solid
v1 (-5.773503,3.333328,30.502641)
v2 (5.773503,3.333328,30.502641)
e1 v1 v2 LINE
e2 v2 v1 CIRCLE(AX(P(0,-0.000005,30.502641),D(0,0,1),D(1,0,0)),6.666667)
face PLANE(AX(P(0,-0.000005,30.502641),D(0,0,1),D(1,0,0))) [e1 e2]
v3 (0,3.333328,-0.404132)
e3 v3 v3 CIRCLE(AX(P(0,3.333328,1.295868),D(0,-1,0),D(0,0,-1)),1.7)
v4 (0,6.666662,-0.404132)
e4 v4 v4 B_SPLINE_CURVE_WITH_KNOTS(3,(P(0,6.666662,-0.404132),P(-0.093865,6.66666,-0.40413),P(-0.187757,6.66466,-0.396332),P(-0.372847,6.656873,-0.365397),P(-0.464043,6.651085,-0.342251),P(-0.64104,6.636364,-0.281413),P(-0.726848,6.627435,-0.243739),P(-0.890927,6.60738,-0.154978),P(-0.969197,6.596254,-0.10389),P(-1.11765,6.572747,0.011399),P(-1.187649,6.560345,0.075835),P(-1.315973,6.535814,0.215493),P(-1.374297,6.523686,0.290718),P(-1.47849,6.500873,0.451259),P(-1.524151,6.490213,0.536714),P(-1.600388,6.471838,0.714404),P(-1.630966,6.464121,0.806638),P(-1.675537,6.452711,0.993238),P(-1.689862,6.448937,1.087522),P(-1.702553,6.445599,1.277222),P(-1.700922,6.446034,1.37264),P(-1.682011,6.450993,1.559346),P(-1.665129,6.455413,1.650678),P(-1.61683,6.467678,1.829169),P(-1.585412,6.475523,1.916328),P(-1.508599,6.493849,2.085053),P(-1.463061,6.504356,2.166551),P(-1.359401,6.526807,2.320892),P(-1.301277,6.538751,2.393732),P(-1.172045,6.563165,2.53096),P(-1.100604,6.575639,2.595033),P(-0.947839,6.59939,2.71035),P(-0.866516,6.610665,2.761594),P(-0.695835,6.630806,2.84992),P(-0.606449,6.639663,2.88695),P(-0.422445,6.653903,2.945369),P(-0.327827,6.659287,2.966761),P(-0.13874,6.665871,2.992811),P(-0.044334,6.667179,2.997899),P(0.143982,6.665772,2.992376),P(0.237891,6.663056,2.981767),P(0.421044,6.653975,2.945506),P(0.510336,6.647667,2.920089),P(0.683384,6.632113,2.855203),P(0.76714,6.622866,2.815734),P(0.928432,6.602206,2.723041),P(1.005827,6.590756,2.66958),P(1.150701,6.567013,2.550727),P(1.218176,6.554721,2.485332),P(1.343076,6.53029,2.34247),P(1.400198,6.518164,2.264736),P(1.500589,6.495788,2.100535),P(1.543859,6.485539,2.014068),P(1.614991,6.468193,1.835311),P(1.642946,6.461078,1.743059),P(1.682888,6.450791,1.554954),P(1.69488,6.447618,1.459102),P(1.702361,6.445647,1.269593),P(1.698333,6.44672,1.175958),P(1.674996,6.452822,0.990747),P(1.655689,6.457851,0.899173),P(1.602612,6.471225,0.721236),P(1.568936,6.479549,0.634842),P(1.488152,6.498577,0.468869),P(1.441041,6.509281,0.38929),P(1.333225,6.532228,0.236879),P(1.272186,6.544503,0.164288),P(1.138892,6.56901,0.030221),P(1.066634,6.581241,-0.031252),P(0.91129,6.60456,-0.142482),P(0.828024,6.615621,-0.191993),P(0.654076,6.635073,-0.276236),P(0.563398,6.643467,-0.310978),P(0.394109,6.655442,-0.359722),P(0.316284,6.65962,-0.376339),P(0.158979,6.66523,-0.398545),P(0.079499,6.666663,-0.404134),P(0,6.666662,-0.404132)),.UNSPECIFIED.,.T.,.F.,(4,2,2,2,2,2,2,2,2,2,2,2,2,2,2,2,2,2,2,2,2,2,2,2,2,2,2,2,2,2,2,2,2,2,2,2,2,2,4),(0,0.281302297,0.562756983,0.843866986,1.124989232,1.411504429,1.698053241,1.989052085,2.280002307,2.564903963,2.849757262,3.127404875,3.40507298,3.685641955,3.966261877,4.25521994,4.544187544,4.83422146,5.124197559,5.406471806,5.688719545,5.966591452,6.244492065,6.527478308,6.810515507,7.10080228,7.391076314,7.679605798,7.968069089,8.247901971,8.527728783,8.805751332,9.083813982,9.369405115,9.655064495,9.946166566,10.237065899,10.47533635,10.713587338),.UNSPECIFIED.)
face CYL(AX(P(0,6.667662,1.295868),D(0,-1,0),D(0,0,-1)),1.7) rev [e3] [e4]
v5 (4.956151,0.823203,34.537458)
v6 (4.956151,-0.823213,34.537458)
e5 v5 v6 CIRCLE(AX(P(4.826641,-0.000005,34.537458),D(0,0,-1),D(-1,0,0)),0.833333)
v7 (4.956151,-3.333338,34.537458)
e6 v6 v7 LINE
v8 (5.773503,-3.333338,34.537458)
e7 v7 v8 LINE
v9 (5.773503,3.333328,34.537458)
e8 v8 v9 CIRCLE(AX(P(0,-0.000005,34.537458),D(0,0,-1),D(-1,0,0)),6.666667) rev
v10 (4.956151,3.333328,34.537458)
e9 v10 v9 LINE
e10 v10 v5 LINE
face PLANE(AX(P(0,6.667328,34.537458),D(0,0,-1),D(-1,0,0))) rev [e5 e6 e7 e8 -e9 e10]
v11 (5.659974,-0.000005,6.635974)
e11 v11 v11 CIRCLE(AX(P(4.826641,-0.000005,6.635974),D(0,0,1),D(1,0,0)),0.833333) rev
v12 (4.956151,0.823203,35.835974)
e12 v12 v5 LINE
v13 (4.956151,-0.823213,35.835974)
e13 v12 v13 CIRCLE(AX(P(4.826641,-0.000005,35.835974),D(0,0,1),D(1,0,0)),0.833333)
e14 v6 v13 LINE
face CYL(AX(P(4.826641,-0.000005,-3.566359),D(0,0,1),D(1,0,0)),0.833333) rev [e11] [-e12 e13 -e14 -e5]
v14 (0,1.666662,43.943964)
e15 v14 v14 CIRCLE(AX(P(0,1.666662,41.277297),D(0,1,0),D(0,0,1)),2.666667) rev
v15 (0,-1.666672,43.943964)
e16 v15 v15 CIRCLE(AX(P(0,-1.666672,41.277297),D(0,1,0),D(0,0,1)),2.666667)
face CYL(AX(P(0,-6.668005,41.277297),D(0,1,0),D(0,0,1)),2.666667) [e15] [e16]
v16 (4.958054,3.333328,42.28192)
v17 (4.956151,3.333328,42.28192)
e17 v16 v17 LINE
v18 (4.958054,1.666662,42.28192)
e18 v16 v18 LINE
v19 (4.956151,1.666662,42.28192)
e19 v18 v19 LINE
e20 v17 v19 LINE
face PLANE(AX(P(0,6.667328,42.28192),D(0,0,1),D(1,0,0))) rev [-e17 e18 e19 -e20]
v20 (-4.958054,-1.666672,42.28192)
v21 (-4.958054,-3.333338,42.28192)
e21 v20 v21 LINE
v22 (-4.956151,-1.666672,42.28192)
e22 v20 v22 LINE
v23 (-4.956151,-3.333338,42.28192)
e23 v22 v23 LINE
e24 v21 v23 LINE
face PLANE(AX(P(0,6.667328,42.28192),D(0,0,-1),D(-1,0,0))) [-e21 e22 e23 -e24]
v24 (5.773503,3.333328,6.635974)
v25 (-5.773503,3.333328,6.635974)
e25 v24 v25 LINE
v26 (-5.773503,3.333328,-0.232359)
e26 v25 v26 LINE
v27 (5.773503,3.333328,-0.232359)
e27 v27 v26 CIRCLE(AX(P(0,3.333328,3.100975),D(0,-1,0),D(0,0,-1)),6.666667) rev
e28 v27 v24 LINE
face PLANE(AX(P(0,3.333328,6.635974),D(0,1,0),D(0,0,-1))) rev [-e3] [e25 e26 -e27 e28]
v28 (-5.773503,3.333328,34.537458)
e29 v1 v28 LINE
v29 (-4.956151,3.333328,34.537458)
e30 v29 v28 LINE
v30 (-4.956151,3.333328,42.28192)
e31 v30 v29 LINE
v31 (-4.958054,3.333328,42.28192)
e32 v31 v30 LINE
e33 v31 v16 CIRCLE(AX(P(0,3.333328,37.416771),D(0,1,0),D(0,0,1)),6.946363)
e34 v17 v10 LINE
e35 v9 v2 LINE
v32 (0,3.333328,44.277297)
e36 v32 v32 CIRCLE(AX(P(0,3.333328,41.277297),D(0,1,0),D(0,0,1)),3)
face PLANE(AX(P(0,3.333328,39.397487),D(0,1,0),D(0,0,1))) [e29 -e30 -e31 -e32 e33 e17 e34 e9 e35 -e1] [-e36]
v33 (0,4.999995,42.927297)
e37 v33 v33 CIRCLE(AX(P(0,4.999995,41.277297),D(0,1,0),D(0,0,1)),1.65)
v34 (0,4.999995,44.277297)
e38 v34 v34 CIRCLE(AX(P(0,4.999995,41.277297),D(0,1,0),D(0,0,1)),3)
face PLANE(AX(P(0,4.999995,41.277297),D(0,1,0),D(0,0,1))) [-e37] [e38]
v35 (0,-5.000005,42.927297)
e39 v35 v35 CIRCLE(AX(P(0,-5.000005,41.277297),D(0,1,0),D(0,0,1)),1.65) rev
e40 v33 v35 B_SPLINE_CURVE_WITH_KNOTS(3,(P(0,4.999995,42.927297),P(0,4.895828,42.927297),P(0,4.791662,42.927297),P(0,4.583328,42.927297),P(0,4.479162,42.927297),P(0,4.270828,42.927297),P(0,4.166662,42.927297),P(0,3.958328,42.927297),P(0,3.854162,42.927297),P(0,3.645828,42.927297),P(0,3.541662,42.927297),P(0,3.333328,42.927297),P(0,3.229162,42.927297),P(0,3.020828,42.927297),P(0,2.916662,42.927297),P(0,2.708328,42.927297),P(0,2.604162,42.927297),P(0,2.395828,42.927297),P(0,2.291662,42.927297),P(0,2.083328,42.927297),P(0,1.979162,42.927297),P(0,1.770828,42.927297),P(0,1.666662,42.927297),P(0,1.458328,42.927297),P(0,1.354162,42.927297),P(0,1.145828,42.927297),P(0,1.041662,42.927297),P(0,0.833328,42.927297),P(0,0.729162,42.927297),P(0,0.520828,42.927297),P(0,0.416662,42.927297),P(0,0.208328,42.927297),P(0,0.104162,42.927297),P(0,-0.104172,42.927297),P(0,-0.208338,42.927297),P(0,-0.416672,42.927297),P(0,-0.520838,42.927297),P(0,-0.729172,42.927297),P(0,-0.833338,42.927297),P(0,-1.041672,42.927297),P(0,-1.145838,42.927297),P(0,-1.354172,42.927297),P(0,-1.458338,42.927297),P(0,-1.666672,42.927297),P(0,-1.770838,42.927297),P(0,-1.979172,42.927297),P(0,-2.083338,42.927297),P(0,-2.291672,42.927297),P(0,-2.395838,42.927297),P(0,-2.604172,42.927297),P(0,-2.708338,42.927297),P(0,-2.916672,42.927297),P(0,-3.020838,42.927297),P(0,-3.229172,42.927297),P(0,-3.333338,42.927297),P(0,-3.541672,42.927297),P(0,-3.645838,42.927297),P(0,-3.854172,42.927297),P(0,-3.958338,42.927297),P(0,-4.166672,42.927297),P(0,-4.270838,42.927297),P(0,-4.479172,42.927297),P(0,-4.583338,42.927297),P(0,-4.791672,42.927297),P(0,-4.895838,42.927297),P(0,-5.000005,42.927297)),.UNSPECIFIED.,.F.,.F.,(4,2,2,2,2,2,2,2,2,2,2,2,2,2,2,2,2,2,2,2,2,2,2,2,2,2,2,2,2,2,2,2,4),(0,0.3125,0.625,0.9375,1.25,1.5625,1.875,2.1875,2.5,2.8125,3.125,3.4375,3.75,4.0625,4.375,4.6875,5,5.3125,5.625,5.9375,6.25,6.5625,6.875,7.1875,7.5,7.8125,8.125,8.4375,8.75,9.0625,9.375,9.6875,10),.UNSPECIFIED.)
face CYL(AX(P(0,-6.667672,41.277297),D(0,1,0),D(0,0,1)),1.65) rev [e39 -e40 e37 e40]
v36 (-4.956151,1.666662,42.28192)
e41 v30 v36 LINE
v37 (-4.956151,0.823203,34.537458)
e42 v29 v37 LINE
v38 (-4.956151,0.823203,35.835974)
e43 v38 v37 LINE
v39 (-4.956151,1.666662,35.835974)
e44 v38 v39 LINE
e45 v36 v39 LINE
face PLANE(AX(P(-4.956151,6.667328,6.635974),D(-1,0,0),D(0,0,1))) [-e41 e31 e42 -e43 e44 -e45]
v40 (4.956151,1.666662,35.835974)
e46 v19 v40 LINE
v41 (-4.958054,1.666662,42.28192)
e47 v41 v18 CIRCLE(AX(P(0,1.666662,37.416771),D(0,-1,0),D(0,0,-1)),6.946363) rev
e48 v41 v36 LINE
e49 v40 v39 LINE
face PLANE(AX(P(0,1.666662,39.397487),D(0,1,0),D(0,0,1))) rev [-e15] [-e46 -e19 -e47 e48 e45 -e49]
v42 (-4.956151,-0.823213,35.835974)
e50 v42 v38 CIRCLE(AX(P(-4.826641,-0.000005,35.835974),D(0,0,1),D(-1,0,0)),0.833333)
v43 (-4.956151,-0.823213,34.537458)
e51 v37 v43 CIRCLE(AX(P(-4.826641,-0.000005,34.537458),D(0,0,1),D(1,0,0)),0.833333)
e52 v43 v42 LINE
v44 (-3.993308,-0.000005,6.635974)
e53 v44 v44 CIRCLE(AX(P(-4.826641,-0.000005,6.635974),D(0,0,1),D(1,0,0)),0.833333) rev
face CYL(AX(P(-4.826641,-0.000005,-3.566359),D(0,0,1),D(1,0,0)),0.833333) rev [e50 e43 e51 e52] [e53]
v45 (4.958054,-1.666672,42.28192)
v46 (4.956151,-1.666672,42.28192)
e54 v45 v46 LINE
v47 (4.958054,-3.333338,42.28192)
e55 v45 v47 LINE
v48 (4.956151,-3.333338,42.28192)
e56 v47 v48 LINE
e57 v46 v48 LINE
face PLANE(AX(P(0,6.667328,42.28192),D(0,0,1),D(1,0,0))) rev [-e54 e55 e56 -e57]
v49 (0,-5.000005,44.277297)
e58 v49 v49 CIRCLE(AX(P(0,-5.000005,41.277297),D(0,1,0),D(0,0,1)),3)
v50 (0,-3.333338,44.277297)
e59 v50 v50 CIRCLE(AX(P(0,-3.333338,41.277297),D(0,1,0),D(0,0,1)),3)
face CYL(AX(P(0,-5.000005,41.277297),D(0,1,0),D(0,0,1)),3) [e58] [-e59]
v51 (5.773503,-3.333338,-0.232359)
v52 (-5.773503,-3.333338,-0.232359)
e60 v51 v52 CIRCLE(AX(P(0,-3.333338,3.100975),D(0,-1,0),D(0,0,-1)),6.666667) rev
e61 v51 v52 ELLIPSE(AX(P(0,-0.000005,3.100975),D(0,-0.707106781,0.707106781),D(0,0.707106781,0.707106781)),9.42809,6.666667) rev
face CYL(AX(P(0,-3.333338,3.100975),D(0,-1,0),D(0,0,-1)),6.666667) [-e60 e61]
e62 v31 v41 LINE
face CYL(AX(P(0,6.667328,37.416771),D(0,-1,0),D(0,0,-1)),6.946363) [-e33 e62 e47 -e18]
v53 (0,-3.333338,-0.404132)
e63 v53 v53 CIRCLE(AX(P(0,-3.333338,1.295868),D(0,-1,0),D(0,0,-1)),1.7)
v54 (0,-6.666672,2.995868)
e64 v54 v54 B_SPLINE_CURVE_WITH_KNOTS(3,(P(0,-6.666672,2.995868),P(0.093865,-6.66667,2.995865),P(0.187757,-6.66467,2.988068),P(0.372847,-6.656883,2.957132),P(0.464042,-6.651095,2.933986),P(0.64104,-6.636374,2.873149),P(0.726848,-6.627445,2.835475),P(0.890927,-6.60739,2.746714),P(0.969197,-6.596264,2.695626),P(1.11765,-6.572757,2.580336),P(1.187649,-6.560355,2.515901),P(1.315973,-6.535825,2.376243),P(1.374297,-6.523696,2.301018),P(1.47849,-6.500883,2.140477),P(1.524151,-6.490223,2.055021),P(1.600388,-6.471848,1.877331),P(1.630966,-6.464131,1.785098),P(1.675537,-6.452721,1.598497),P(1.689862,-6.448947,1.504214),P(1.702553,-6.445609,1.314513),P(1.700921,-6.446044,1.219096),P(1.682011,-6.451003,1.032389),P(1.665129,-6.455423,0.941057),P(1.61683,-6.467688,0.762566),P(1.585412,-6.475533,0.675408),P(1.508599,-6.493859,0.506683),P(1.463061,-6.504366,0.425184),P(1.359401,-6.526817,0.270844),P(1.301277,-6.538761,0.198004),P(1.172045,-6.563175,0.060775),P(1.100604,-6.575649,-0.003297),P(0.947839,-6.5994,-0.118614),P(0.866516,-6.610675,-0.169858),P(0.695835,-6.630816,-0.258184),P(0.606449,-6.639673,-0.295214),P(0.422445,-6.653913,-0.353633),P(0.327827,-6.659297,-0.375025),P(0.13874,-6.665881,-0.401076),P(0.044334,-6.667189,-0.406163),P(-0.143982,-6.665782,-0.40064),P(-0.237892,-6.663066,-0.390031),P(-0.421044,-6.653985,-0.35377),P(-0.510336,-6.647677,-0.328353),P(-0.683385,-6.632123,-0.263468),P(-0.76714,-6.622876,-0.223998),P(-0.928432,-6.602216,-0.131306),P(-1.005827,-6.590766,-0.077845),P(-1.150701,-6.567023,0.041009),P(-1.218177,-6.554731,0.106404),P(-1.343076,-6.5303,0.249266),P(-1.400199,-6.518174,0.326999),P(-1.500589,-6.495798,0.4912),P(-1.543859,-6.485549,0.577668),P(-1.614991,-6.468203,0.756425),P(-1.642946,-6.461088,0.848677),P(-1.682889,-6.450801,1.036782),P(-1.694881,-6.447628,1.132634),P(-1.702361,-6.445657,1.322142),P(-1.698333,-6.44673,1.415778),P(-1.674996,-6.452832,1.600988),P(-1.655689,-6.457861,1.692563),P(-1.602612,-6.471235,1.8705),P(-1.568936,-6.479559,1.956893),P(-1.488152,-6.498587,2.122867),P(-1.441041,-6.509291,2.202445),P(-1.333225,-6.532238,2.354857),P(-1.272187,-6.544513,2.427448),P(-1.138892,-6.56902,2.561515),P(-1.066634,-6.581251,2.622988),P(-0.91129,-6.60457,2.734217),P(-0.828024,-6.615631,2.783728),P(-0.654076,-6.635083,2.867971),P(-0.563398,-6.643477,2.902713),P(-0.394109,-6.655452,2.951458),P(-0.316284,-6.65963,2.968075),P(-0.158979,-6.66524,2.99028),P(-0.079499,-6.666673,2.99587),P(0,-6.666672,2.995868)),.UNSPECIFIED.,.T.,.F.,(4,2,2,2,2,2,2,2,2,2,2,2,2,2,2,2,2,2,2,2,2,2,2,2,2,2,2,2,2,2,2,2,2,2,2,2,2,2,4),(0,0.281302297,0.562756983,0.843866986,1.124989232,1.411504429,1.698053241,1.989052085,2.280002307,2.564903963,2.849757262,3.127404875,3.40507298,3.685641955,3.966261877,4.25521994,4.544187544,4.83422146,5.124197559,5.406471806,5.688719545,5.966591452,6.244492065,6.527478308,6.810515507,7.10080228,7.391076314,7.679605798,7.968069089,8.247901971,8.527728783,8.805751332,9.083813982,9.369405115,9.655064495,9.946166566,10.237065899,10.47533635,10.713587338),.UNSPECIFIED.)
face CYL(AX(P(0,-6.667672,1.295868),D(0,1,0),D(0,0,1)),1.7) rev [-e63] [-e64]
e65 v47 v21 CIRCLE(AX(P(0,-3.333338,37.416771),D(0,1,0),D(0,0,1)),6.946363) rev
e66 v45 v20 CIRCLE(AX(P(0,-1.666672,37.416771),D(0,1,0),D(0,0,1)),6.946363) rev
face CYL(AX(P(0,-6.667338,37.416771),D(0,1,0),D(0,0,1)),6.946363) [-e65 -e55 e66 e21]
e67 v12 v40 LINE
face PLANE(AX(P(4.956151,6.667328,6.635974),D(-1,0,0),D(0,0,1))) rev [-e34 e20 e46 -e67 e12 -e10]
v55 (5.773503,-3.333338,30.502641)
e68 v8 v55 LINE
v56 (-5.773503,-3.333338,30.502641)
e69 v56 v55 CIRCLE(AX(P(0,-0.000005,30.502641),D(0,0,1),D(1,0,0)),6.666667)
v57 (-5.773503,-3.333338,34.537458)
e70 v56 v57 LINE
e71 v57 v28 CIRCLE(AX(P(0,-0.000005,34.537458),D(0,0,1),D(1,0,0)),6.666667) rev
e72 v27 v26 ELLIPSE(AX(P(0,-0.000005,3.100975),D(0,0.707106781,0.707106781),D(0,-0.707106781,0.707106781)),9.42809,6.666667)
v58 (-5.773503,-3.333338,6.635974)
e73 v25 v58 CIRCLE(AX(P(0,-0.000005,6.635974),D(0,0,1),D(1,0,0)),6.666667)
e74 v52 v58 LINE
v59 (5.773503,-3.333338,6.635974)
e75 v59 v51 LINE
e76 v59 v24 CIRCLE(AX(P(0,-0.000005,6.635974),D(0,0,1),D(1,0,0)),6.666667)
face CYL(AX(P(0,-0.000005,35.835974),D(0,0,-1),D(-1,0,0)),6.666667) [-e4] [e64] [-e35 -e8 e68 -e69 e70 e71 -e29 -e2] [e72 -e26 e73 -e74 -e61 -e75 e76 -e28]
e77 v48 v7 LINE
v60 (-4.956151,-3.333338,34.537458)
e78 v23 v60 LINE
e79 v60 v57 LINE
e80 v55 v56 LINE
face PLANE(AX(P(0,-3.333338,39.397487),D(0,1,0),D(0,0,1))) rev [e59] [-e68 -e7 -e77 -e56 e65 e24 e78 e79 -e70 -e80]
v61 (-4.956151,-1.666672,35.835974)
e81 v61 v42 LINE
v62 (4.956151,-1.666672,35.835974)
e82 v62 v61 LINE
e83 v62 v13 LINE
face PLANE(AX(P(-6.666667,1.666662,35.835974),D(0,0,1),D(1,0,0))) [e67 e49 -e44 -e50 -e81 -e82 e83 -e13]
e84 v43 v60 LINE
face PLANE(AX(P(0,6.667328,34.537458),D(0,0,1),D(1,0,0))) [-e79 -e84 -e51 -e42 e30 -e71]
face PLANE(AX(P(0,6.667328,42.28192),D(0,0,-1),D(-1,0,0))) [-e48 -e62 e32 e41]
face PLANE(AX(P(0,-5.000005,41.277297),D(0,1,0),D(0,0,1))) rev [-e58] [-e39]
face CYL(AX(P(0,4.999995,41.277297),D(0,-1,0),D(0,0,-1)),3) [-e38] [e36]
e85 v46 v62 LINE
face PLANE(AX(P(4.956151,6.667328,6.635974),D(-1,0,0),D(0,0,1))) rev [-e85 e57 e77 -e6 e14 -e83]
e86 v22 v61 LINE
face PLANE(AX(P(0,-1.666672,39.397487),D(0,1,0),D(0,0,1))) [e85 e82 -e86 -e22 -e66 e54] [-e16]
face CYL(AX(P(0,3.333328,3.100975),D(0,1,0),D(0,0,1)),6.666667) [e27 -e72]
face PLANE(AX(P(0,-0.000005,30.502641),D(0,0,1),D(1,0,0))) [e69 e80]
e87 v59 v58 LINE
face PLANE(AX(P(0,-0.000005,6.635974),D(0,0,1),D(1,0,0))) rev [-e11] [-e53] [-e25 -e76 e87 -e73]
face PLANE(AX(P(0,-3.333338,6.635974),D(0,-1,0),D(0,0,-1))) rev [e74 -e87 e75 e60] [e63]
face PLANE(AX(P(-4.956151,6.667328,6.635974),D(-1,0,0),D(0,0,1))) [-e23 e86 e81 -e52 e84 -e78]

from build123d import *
from build123d.topology import SkipClean

# Parameters (mm, degrees)
SKETCH2_R                       = 10
PHALANGE_LENGTH_DEPTH           = 43.8
BOSS_EXTRUDE3_DEPTH             = 5
BOSS_EXTRUDE4_DEPTH             = 5
BOSS_EXTRUDE4_DEPTH_BACK        = 5
CUT_EXTRUDE2_START              = -15.3025
CUT_EXTRUDE2_DEPTH              = 15.3025
SKETCH7_R                       = 1.65
CUT_EXTRUDE3_DEPTH              = 10
CUT_EXTRUDE4_DEPTH              = 2.5
CUT_EXTRUDE4_DEPTH_BACK         = 2.5
CUT_EXTRUDE7_REACH              = 63.838
SKETCH4_R                       = 1.65
CUT_EXTRUDE7_DIRECTION_2_REACH  = 63.838
CUT_EXTRUDE_THIN1_START         = 43.8
CUT_EXTRUDE_THIN1_DEPTH         = 10.361670454
BOSS_EXTRUDE5_REACH             = 63.28
SKETCH9_R                       = 4
SKETCH9_R_2                     = 1.65
CUT_EXTRUDE8_REACH              = 62.771
SKETCH10_R                      = 1.25
CUT_EXTRUDE9_START              = -8
CUT_EXTRUDE9_DEPTH              = 8
CUT_EXTRUDE10_REACH             = 63.28
CUT_EXTRUDE10_DIRECTION_2_REACH = 63.28
CUT_EXTRUDE11_START             = -10
CUT_EXTRUDE11_OUTLINE_W         = 2.565773848
CUT_EXTRUDE11_OUTLINE_H         = 11.6166929
CUT_EXTRUDE11_DEPTH             = 10
BOSS_EXTRUDE6_START             = 7.5
SKETCH14_R                      = 4.5
SKETCH14_R_2                    = 1.65
BOSS_EXTRUDE6_DEPTH             = 2.5
BOSS_EXTRUDE7_START             = -7.5
SKETCH14_2_R                    = 4.5
SKETCH14_2_R_2                  = 1.65
BOSS_EXTRUDE7_DEPTH             = 2.5
SCALE1_SCALE                    = 0.666666667
CUT_EXTRUDE12_START             = -11.666667
SKETCH15_R                      = 1.65
CUT_EXTRUDE12_DEPTH             = 13.333339
CUT_EXTRUDE13_REACH             = 47.962
SKETCH16_R                      = 1.7
CUT_EXTRUDE13_DIRECTION_2_REACH = 47.962


# Read off the part's stored shape, not the designer's step: Cut-Extrude-Thin1, Cut-Extrude11
with BuildPart() as part:
    # Sketch2 → Phalange Length (new body)
    with BuildSketch(Plane.XY):
        Circle(SKETCH2_R)
    extrude(amount=PHALANGE_LENGTH_DEPTH)

    # Sketch3 → Boss-Extrude3 (add)
    with BuildSketch(Plane(origin=(0, -10, 0), x_dir=(-1, 0, 0), z_dir=(0, -1, 0))):
        with BuildLine():
            Line((-10, 5.302499701), (-10, 0))
            Line((-10, 0), (10, 0))
            Line((10, 0), (10, 5.302499701))
            ThreePointArc((10, 5.302499701), (0, 15.302499701), (-10, 5.302499701))
        make_face()
    boss_extrude3 = extrude(amount=-BOSS_EXTRUDE3_DEPTH)

    # Mirror1: Boss-Extrude3 across plane
    add(boss_extrude3.mirror(Plane.ZX))

    # Sketch5 → Boss-Extrude4 (add, two sides: drawn at the far end of the back side and taken through both)
    with BuildSketch(Plane(origin=(0, 0, 0), x_dir=(1, 0, 0), z_dir=(0, 1, 0)).offset(-BOSS_EXTRUDE4_DEPTH_BACK)):
        with BuildLine():
            Line((-10, -49.583157911), (-10, -43.8))
            Line((-10, -43.8), (10, -43.8))
            Line((10, -43.8), (10, -49.583157911))
            ThreePointArc((10, -49.583157911), (0, -59.151984156), (-10, -49.583157911))
        make_face()
    extrude(amount=BOSS_EXTRUDE4_DEPTH + BOSS_EXTRUDE4_DEPTH_BACK)

    # Sketch6 → Cut-Extrude2 (cut)
    with SkipClean():  # the faces are left unmerged after this step: merging them gives an invalid solid
        with BuildSketch(Plane.XY.offset(CUT_EXTRUDE2_START)):
            with BuildLine():
                ThreePointArc((0, 10), (5, 8.660254038), (8.660254038, 5))
                Line((8.660254038, 5), (10, 5))
                Line((10, 5), (10, 10))
                Line((10, 10), (0, 10))
            make_face()
            with BuildLine():
                Line((10, -5), (8.660254038, -5))
                ThreePointArc((8.660254038, -5), (5, -8.660254038), (0, -10))
                Line((0, -10), (10, -10))
                Line((10, -10), (10, -5))
            make_face()
            with BuildLine():
                ThreePointArc((-8.660254038, 5), (-5, 8.660254038), (0, 10))
                Line((0, 10), (-10, 10))
                Line((-10, 10), (-10, 5))
                Line((-10, 5), (-8.660254038, 5))
            make_face()
            with BuildLine():
                Line((-10, -10), (0, -10))
                ThreePointArc((0, -10), (-5, -8.660254038), (-8.660254038, -5))
                Line((-8.660254038, -5), (-10, -5))
                Line((-10, -5), (-10, -10))
            make_face()
        extrude(amount=CUT_EXTRUDE2_DEPTH, mode=Mode.SUBTRACT)

    # Sketch7 → Cut-Extrude3 (cut)
    with SkipClean():  # the faces are left unmerged after this step: merging them gives an invalid solid
        with BuildSketch(Plane(origin=(0, 5, 0), x_dir=(1, 0, 0), z_dir=(0, 1, 0))):
            with Locations(Location((0, -51.961984156, 0), (0, 0, 270))):
                Circle(SKETCH7_R)
        extrude(amount=-CUT_EXTRUDE3_DEPTH, mode=Mode.SUBTRACT)

    # Sketch5<2> → Cut-Extrude4 (cut, two sides: drawn at the far end of the back side and taken through both)
    with BuildSketch(Plane(origin=(0, 0, 0), x_dir=(1, 0, 0), z_dir=(0, 1, 0)).offset(-CUT_EXTRUDE4_DEPTH_BACK)):
        with BuildLine():
            Line((-10, -49.583157911), (-10, -43.8))
            Line((-10, -43.8), (10, -43.8))
            Line((10, -43.8), (10, -49.583157911))
            ThreePointArc((10, -49.583157911), (0, -59.151984156), (-10, -49.583157911))
        make_face()
    extrude(amount=CUT_EXTRUDE4_DEPTH + CUT_EXTRUDE4_DEPTH_BACK, mode=Mode.SUBTRACT)

    # Sketch4 → Cut-Extrude7 (cut, up to next)
    with BuildSketch(Plane(origin=(0, -5, 0), x_dir=(1, 0, 0), z_dir=(0, 1, 0)), mode=Mode.PRIVATE) as cut_extrude7_sk1:
        with Locations(Location((0, 8.010159673, 0), (0, 0, 270))):
            Circle(SKETCH4_R)
    cut_extrude7_tool1 = extrude(cut_extrude7_sk1.sketch, amount=-CUT_EXTRUDE7_REACH, mode=Mode.PRIVATE) & part.part
    add(cut_extrude7_tool1.solids().sort_by_distance((0, -5, -8.01016))[0], mode=Mode.SUBTRACT)

    # Sketch4 → Cut-Extrude7 direction 2 (cut, up to next)
    with BuildSketch(Plane(origin=(0, -5, 0), x_dir=(1, 0, 0), z_dir=(0, 1, 0)), mode=Mode.PRIVATE) as cut_extrude7_direction_2_sk1:
        with Locations(Location((0, 8.010159673, 0), (0, 0, 270))):
            Circle(SKETCH4_R)
    cut_extrude7_direction_2_tool1 = extrude(cut_extrude7_direction_2_sk1.sketch, amount=CUT_EXTRUDE7_DIRECTION_2_REACH, mode=Mode.PRIVATE) & part.part
    add(cut_extrude7_direction_2_tool1.solids().sort_by_distance((0, -5, -8.01016))[0], mode=Mode.SUBTRACT)

    # Cut-Extrude-Thin1 outline → Cut-Extrude-Thin1 (cut)
    with SkipClean():  # the faces are left unmerged after this step: merging them gives an invalid solid
        with BuildSketch(Plane.XY.offset(CUT_EXTRUDE_THIN1_START)):
            with BuildLine():
                ThreePointArc((8.660254038, 5), (9.256147934, 3.78466979), (9.682458366, 2.5))
                Line((9.682458366, 2.5), (10, 2.5))
                Line((10, 2.5), (10, 5))
                Line((10, 5), (8.660254038, 5))
            make_face()
            with BuildLine():
                Line((10, -2.5), (9.682458366, -2.5))
                ThreePointArc((9.682458366, -2.5), (9.256147934, -3.78466979), (8.660254038, -5))
                Line((8.660254038, -5), (10, -5))
                Line((10, -5), (10, -2.5))
            make_face()
            with BuildLine():
                Line((-10, 2.5), (-9.682458366, 2.5))
                ThreePointArc((-9.682458366, 2.5), (-9.256147934, 3.78466979), (-8.660254038, 5))
                Line((-8.660254038, 5), (-10, 5))
                Line((-10, 5), (-10, 2.5))
            make_face()
            with BuildLine():
                ThreePointArc((-8.660254038, -5), (-9.256147934, -3.78466979), (-9.682458366, -2.5))
                Line((-9.682458366, -2.5), (-10, -2.5))
                Line((-10, -2.5), (-10, -5))
                Line((-10, -5), (-8.660254038, -5))
            make_face()
        extrude(amount=CUT_EXTRUDE_THIN1_DEPTH, mode=Mode.SUBTRACT)

    # Sketch9 → Boss-Extrude5 (add, up to next)
    with BuildSketch(Plane.XZ.offset(-2.5), mode=Mode.PRIVATE) as boss_extrude5_sk1:
        with Locations(Location((0, 51.961984156, 0), (0, 0, 90))):
            Circle(SKETCH9_R)
        with Locations(Location((0, 51.961984156, 0), (0, 0, 90))):
            Circle(SKETCH9_R_2, mode=Mode.SUBTRACT)
    boss_extrude5_tool1 = extrude(boss_extrude5_sk1.sketch, amount=BOSS_EXTRUDE5_REACH, mode=Mode.PRIVATE) - part.part
    add(boss_extrude5_tool1.solids().sort_by_distance((0, 2.5, 48.075121))[0])

    # Sketch10 → Cut-Extrude8 (cut, up to next)
    with BuildSketch(Plane.XY.offset(43.8), mode=Mode.PRIVATE) as cut_extrude8_sk1:
        with Locations((7.239961745, 0)):
            Circle(SKETCH10_R)
    cut_extrude8_tool1 = extrude(cut_extrude8_sk1.sketch, amount=-CUT_EXTRUDE8_REACH, mode=Mode.PRIVATE) & part.part
    # Sketch10 → Cut-Extrude8 (cut, up to next)
    with BuildSketch(Plane.XY.offset(43.8), mode=Mode.PRIVATE) as cut_extrude8_sk2:
        with Locations((-7.239961745, 0)):
            Circle(SKETCH10_R)
    cut_extrude8_tool2 = extrude(cut_extrude8_sk2.sketch, amount=-CUT_EXTRUDE8_REACH, mode=Mode.PRIVATE) & part.part
    add(cut_extrude8_tool1.solids().sort_by_distance((7.239962, 0, 43.8))[0], mode=Mode.SUBTRACT)
    add(cut_extrude8_tool2.solids().sort_by_distance((-7.239962, 0, 43.8))[0], mode=Mode.SUBTRACT)

    # Sketch11 → Cut-Extrude9 (cut)
    with SkipClean():  # the faces are left unmerged after this step: merging them gives an invalid solid
        with BuildSketch(Plane.XY.offset(43.8).offset(CUT_EXTRUDE9_START)):
            with BuildLine():
                ThreePointArc((8.660254038, 5), (0, 10), (-8.660254038, 5))
                Line((-8.660254038, 5), (8.660254038, 5))
            make_face()
            with BuildLine():
                Line((8.660254038, -5), (-8.660254038, -5))
                ThreePointArc((-8.660254038, -5), (0, -10), (8.660254038, -5))
            make_face()
        extrude(amount=CUT_EXTRUDE9_DEPTH, mode=Mode.SUBTRACT)

    # Sketch12 → Cut-Extrude10 (cut, up to next)
    with BuildSketch(Plane.XZ.offset(-2.5), mode=Mode.PRIVATE) as cut_extrude10_sk1:
        with BuildLine():
            ThreePointArc((0, 59.151984156), (-5.99753031, 57.15625831), (-9.603498629, 51.964892021))
            Line((-9.603498629, 51.964892021), (-8.660254038, 51.964892021))
            ThreePointArc((-8.660254038, 51.964892021), (0, 56.590740593), (8.660254038, 51.964892021))
            Line((8.660254038, 51.964892021), (9.603498629, 51.964892021))
            ThreePointArc((9.603498629, 51.964892021), (5.99753031, 57.15625831), (0, 59.151984156))
        make_face()
    cut_extrude10_tool1 = extrude(cut_extrude10_sk1.sketch, amount=CUT_EXTRUDE10_REACH, mode=Mode.PRIVATE) & part.part
    add(cut_extrude10_tool1.solids().sort_by_distance((5.874655, 2.5, 56.99207))[0], mode=Mode.SUBTRACT)

    # Sketch12 → Cut-Extrude10 direction 2 (cut, up to next)
    with BuildSketch(Plane.XZ.offset(-2.5), mode=Mode.PRIVATE) as cut_extrude10_direction_2_sk1:
        with BuildLine():
            ThreePointArc((0, 59.151984156), (-5.99753031, 57.15625831), (-9.603498629, 51.964892021))
            Line((-9.603498629, 51.964892021), (-8.660254038, 51.964892021))
            ThreePointArc((-8.660254038, 51.964892021), (0, 56.590740593), (8.660254038, 51.964892021))
            Line((8.660254038, 51.964892021), (9.603498629, 51.964892021))
            ThreePointArc((9.603498629, 51.964892021), (5.99753031, 57.15625831), (0, 59.151984156))
        make_face()
    cut_extrude10_direction_2_tool1 = extrude(cut_extrude10_direction_2_sk1.sketch, amount=-CUT_EXTRUDE10_DIRECTION_2_REACH, mode=Mode.PRIVATE) & part.part
    add(cut_extrude10_direction_2_tool1.solids().sort_by_distance((5.874655, 2.5, 56.99207))[0], mode=Mode.SUBTRACT)

    # Cut-Extrude11 outline → Cut-Extrude11 (cut)
    with BuildSketch(Plane.XZ.offset(5).offset(CUT_EXTRUDE11_START)):
        with Locations((-8.717113076, 47.660571369)):
            Rectangle(CUT_EXTRUDE11_OUTLINE_W, CUT_EXTRUDE11_OUTLINE_H)
        with Locations((8.717113076, 47.660571369)):
            Rectangle(CUT_EXTRUDE11_OUTLINE_W, CUT_EXTRUDE11_OUTLINE_H)
    extrude(amount=CUT_EXTRUDE11_DEPTH, mode=Mode.SUBTRACT)

    # Sketch14 → Boss-Extrude6 (add)
    with SkipClean():  # the faces are left unmerged after this step: merging them gives an invalid solid
        with BuildSketch(Plane(origin=(0, 0, 0), x_dir=(1, 0, 0), z_dir=(0, 1, 0)).offset(BOSS_EXTRUDE6_START)):
            with Locations(Location((0, -51.961984156, 0), (0, 0, 270))):
                Circle(SKETCH14_R)
            with Locations(Location((0, -51.961984156, 0), (0, 0, 270))):
                Circle(SKETCH14_R_2, mode=Mode.SUBTRACT)
        extrude(amount=-BOSS_EXTRUDE6_DEPTH)

    # Sketch14<2> → Boss-Extrude7 (add)
    with SkipClean():  # the faces are left unmerged after this step: merging them gives an invalid solid
        with BuildSketch(Plane(origin=(0, 0, 0), x_dir=(1, 0, 0), z_dir=(0, 1, 0)).offset(BOSS_EXTRUDE7_START)):
            with Locations(Location((0, -51.961984156, 0), (0, 0, 270))):
                Circle(SKETCH14_2_R)
            with Locations(Location((0, -51.961984156, 0), (0, 0, 270))):
                Circle(SKETCH14_2_R_2, mode=Mode.SUBTRACT)
        extrude(amount=BOSS_EXTRUDE7_DEPTH)


with BuildPart() as part_1:
    # Scale1: scaled about (0, 4.7e-08, 19.907417167)
    add(part.part.scale(SCALE1_SCALE).moved(Location((0, 1.6e-08, 6.635805722))))

    # Sketch15 → Cut-Extrude12 (cut)
    with BuildSketch(Plane(origin=(0, 4.999994984, 0), x_dir=(1, 0, 0), z_dir=(0, 1, 0)).offset(CUT_EXTRUDE12_START)):
        with Locations(Location((-4.7e-08, -41.277297094, 0), (0, 0, 270))):
            Circle(SKETCH15_R)
    extrude(amount=CUT_EXTRUDE12_DEPTH, mode=Mode.SUBTRACT)

    # Sketch16 → Cut-Extrude13 (cut, up to next)
    with BuildSketch(Plane.XZ.offset(-3.333328317), mode=Mode.PRIVATE) as cut_extrude13_sk1:
        with Locations(Location((-4.7e-08, 1.295867875, 0), (0, 0, 270))):
            Circle(SKETCH16_R)
    cut_extrude13_tool1 = extrude(cut_extrude13_sk1.sketch, amount=-CUT_EXTRUDE13_REACH, mode=Mode.PRIVATE) & part_1.part
    add(cut_extrude13_tool1.solids().sort_by_distance((0, 3.333328, 1.295868))[0], mode=Mode.SUBTRACT)

    # Sketch16 → Cut-Extrude13 direction 2 (cut, up to next)
    with BuildSketch(Plane.XZ.offset(-3.333328317), mode=Mode.PRIVATE) as cut_extrude13_direction_2_sk1:
        with Locations(Location((-4.7e-08, 1.295867875, 0), (0, 0, 270))):
            Circle(SKETCH16_R)
    cut_extrude13_direction_2_tool1 = extrude(cut_extrude13_direction_2_sk1.sketch, amount=CUT_EXTRUDE13_DIRECTION_2_REACH, mode=Mode.PRIVATE) & part_1.part
    add(cut_extrude13_direction_2_tool1.solids().sort_by_distance((0, 3.333328, 1.295868))[0], mode=Mode.SUBTRACT)


solid = part_1.part
